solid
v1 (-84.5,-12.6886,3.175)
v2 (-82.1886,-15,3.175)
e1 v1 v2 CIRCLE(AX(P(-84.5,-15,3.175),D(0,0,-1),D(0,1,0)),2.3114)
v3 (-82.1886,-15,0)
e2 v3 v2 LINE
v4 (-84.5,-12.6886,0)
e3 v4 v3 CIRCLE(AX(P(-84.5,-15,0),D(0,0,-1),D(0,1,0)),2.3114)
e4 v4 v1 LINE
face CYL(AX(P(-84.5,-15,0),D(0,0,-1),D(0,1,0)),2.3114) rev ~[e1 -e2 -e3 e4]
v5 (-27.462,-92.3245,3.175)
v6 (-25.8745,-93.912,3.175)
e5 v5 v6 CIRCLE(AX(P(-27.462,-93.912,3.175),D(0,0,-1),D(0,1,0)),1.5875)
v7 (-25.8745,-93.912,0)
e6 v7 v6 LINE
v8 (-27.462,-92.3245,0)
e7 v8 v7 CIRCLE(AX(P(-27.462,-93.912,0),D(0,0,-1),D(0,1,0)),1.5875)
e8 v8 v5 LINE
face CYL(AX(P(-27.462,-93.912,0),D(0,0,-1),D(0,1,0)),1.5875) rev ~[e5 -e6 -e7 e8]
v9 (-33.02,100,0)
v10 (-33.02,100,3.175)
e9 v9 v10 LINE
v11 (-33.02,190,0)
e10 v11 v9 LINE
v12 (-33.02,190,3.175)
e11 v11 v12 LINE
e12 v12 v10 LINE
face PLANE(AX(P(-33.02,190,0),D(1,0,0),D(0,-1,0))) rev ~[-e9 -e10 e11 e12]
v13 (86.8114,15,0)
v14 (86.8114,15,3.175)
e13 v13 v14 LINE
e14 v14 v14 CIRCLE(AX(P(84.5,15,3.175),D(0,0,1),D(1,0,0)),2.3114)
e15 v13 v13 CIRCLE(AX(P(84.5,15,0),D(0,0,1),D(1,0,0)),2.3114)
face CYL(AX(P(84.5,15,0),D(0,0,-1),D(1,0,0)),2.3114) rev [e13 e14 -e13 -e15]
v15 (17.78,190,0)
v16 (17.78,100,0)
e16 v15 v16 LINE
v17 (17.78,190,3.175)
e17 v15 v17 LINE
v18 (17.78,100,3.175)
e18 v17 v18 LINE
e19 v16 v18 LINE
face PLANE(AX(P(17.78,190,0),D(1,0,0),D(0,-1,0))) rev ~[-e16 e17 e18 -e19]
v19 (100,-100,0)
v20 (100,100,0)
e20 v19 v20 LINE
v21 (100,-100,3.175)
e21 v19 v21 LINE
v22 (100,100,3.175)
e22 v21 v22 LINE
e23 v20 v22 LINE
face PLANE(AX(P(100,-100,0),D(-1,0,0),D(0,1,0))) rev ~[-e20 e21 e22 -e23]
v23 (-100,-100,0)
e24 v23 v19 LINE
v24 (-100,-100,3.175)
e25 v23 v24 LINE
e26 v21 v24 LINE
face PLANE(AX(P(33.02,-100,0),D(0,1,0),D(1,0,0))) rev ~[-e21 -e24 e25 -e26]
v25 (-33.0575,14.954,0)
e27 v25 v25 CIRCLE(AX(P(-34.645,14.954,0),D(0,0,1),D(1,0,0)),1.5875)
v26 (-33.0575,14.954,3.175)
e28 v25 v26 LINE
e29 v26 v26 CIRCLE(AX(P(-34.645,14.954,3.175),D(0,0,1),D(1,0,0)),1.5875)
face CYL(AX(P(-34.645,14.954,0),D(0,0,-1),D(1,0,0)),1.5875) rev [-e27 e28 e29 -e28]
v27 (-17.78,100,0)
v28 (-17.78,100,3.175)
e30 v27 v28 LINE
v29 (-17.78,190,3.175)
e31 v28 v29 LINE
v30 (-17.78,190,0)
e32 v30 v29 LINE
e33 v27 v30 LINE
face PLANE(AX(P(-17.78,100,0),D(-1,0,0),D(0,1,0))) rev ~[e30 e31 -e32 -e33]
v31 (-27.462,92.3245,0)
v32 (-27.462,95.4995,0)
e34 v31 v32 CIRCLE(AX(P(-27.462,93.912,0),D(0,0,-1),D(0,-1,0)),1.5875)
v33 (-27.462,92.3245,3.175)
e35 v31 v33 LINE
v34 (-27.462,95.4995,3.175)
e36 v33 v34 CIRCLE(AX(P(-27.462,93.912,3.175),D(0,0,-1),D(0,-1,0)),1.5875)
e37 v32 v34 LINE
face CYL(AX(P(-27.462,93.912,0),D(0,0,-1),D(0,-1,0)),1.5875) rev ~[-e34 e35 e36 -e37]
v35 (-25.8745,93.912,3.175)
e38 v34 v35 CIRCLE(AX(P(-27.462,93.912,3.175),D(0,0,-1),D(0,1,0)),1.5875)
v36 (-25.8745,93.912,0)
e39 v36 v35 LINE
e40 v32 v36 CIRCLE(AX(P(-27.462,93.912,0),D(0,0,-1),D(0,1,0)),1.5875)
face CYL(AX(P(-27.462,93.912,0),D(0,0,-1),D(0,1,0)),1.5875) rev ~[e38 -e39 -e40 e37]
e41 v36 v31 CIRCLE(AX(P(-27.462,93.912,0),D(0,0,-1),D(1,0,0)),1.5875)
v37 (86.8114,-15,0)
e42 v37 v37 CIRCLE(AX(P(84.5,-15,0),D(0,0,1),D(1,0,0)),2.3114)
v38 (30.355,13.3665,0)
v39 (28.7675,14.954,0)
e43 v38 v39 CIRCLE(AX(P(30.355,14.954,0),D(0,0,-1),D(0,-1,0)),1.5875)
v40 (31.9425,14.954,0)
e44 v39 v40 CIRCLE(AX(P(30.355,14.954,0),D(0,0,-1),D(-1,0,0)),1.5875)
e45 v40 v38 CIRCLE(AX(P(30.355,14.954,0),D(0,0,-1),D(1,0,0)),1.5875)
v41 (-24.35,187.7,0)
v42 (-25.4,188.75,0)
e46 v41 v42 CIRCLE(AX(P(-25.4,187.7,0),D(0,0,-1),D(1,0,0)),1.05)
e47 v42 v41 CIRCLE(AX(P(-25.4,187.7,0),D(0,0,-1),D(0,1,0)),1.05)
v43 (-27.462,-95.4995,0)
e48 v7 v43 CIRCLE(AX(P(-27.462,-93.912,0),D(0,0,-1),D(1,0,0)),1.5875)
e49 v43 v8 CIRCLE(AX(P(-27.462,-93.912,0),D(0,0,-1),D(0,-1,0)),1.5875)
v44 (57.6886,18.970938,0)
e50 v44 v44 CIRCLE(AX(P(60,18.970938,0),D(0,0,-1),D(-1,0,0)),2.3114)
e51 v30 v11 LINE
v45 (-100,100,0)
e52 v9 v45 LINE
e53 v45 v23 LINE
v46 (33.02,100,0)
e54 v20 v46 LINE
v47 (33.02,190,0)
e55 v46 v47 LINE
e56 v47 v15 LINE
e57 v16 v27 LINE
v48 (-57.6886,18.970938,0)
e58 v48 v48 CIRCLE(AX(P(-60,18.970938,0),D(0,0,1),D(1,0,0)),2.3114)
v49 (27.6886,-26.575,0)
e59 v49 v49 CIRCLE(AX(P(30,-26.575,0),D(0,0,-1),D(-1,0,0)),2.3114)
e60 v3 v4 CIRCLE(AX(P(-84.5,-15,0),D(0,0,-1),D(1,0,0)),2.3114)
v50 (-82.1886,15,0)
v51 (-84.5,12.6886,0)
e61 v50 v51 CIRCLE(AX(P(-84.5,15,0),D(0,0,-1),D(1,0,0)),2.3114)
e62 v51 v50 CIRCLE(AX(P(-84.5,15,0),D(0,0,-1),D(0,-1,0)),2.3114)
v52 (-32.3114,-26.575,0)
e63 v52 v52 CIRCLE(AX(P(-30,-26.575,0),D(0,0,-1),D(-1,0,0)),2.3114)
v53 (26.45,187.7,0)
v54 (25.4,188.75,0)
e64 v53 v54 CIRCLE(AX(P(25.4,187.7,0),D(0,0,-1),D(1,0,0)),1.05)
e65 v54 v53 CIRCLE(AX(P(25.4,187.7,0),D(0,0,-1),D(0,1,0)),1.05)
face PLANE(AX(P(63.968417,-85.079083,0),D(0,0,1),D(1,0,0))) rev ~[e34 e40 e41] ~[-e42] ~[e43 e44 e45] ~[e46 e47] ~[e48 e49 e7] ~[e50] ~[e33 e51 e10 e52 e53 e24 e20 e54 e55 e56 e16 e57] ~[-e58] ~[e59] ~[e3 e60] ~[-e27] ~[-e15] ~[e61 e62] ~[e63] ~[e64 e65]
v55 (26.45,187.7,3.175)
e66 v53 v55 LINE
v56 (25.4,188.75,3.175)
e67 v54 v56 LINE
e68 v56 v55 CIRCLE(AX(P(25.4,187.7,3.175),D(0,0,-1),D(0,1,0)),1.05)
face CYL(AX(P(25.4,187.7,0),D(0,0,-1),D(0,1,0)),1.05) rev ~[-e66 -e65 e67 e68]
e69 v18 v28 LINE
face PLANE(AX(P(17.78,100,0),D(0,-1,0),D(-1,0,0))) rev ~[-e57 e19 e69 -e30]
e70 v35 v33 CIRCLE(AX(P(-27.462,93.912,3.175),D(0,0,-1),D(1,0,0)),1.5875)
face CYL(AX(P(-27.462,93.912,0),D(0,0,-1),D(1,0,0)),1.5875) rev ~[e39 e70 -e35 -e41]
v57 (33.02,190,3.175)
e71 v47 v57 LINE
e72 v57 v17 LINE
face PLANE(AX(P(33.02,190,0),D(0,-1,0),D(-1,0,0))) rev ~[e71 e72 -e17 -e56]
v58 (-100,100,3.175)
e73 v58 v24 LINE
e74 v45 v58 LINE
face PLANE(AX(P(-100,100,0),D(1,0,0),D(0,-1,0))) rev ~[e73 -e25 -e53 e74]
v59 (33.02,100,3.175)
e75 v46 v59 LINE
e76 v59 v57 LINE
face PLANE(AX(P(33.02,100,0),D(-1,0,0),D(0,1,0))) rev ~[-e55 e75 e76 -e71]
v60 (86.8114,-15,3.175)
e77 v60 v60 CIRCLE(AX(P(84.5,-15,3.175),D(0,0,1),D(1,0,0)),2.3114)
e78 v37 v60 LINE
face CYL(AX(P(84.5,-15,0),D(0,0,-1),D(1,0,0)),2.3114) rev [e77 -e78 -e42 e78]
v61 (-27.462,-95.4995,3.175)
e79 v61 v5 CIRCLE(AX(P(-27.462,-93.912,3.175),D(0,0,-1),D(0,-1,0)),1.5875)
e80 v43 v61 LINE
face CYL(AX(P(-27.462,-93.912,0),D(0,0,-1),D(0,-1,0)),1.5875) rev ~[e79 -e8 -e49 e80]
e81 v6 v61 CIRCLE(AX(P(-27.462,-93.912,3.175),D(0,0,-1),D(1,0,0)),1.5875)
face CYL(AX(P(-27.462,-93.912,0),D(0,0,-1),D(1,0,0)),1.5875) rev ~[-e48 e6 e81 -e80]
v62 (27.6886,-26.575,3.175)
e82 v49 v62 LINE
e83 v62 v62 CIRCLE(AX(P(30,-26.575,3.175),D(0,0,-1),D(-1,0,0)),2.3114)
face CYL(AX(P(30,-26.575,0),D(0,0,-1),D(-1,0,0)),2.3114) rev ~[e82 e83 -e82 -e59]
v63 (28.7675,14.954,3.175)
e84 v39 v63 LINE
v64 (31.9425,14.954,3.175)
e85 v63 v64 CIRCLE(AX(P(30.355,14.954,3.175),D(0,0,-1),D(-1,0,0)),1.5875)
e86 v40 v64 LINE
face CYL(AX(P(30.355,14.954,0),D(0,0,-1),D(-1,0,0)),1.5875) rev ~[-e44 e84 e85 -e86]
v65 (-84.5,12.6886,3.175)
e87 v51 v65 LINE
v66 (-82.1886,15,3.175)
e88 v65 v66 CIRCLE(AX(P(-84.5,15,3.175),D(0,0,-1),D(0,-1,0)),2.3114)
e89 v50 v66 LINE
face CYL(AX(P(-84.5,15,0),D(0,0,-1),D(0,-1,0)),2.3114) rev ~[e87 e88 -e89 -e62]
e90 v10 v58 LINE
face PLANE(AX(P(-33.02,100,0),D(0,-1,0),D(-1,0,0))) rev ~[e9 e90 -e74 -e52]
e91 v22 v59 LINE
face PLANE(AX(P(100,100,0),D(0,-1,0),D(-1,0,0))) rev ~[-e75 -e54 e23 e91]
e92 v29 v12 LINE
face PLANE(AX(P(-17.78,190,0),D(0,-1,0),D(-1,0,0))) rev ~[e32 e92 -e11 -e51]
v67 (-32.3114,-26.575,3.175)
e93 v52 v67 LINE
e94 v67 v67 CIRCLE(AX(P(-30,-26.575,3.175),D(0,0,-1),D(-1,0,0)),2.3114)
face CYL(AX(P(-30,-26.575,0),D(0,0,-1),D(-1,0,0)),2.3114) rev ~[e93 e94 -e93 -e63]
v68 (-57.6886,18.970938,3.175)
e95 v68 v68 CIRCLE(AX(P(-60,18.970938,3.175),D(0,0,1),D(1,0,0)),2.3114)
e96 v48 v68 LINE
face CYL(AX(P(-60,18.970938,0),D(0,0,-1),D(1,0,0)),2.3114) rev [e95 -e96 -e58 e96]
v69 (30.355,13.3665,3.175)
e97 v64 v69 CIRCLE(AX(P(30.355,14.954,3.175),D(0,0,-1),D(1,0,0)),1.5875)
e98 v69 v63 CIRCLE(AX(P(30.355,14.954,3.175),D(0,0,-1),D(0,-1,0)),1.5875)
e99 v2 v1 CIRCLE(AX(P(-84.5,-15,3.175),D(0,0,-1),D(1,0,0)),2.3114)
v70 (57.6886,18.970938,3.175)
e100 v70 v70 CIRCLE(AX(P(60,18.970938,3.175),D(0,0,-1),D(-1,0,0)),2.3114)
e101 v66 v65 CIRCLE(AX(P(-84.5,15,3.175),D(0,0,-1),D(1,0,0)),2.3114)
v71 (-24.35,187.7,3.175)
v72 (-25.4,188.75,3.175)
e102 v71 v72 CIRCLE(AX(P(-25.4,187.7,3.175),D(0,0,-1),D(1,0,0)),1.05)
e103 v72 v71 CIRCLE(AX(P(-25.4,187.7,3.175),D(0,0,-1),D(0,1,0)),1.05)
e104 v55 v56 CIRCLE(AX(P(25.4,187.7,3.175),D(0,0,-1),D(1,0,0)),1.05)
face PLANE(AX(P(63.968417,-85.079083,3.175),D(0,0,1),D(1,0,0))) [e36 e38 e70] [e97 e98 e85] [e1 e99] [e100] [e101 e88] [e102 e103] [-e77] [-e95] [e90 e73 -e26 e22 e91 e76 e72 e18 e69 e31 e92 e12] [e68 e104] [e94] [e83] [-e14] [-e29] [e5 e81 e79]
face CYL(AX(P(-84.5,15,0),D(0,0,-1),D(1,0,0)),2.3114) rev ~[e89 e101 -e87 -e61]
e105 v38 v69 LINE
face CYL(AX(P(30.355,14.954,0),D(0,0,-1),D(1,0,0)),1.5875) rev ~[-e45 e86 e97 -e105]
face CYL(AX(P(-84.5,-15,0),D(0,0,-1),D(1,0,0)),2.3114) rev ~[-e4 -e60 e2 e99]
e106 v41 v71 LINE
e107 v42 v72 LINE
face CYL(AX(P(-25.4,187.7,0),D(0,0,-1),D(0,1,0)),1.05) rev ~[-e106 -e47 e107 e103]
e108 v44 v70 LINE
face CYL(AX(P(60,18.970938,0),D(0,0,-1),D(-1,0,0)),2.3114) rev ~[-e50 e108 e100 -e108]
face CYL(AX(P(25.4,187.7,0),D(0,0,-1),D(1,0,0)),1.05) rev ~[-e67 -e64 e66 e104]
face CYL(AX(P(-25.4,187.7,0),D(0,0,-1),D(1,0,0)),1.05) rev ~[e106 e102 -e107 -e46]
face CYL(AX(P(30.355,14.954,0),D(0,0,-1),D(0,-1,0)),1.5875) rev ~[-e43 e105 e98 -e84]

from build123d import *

# Parameters (mm, degrees)
F0_W     = 51.8
F0_H     = 10
F0_W_2   = 15.24
F0_H_2   = 34.925
F0_R     = 2.3114
F0_R_2   = 1.05
F0_R_3   = 1.5875
F0_W_3   = 9.38
F1_DEPTH = 3.175
F2_DEPTH = 90


# Not quite as in the source:
# - a length typed as a fraction of an inch, garbled in the dataset ("3 / 203.2 mm" for 3/8 in), is restored
# - a feature names something its author has since deleted; it is built from what else it names


with BuildPart() as f1:
    # F0 (on Top) → F1 (new body)
    with BuildSketch(Plane.XY):
        Polygon((42.4, -100), (100, -100), (100, -75.075), (48.2, -75.075), (48.2, -65.075), (33.02, -65.075), (33.02, -100), align=None)
        with Locations((74.1, -70.075)):
            Rectangle(F0_W, F0_H)
        Polygon((33.02, -140), (33.02, -100), (17.78, -100), (17.78, -140), (17.78, -190), (25.4, -190), (33.02, -190), align=None)
        with BuildLine():
            ThreePointArc((26.45, -187.7), (26.1424621202, -188.4424621202), (25.4, -188.75))
            ThreePointArc((25.4, -188.75), (24.6575378798, -186.9575378798), (26.45, -187.7))
        make_face(mode=Mode.SUBTRACT)
        with Locations((25.4, -82.5375)):
            Rectangle(F0_W_2, F0_H_2)
        with Locations((74.1, -60.075)):
            Rectangle(F0_W, F0_H)
        Polygon((0, -100), (17.78, -100), (17.78, -65.075), (-17.78, -65.075), (-17.78, -100), align=None)
        Polygon((17.78, -65.075), (33.02, -65.075), (48.2, -65.075), (48.2, -55.075), (-48.2, -55.075), (-48.2, -65.075), (-33.02, -65.075), (-17.78, -65.075), align=None)
        with BuildLine():
            Line((48.2, -55.075), (100, -55.075))
            Line((100, -55.075), (100, -26.575))
            Line((100, -26.575), (32.3114, -26.575))
            ThreePointArc((32.3114, -26.575), (30, -28.8864), (27.6886, -26.575))
            Line((27.6886, -26.575), (0, -26.575))
            Line((0, -26.575), (-27.6886, -26.575))
            ThreePointArc((-27.6886, -26.575), (-30, -28.8864), (-32.3114, -26.575))
            Line((-32.3114, -26.575), (-100, -26.575))
            Line((-100, -26.575), (-100, -55.075))
            Line((-100, -55.075), (-48.2, -55.075))
            Line((-48.2, -55.075), (48.2, -55.075))
        make_face()
        with BuildLine():
            Line((32.3114, -26.575), (100, -26.575))
            Line((100, -26.575), (100, 0))
            Line((100, 0), (0, 0))
            Line((0, 0), (0, -10.4469014332))
            Line((0, -10.4469014332), (0, -26.575))
            Line((0, -26.575), (27.6886, -26.575))
            ThreePointArc((27.6886, -26.575), (30, -24.2636), (32.3114, -26.575))
        make_face()
        with Locations((84.5, -15)):
            Circle(F0_R, mode=Mode.SUBTRACT)
        Polygon((-17.78, -140), (-17.78, -100), (-27.462, -100), (-33.02, -100), (-33.02, -140), (-33.02, -190), (-25.4, -190), (-17.78, -190), align=None)
        with BuildLine():
            ThreePointArc((-24.35, -187.7), (-24.6575378798, -188.4424621202), (-25.4, -188.75))
            ThreePointArc((-25.4, -188.75), (-26.1424621202, -186.9575378798), (-24.35, -187.7))
        make_face(mode=Mode.SUBTRACT)
        with Locations((-25.4, -137.7)):
            Circle(F0_R_2, mode=Mode.SUBTRACT)
        Polygon((-27.462, -100), (-17.78, -100), (-17.78, -65.075), (-33.02, -65.075), (-33.02, -100), align=None)
        with BuildLine():
            ThreePointArc((-25.8745, -93.912), (-26.3394679849, -95.0345320151), (-27.462, -95.4995))
            ThreePointArc((-27.462, -95.4995), (-29.0495, -93.912), (-27.462, -92.3245))
            ThreePointArc((-27.462, -92.3245), (-26.3394679849, -92.7894679849), (-25.8745, -93.912))
        make_face(mode=Mode.SUBTRACT)
        with BuildLine():
            Line((0, 0), (100, 0))
            Line((100, 0), (100, 55.075))
            Line((100, 55.075), (48.2, 55.075))
            Line((48.2, 55.075), (48.2, 65.075))
            Line((48.2, 65.075), (42.4, 65.075))
            Line((42.4, 65.075), (42.4, 18.9709383994))
            Line((42.4, 18.9709383994), (42.4, 9.75))
            Line((42.4, 9.75), (30.355, 9.75))
            Line((30.355, 9.75), (-42.4, 9.75))
            Line((-42.4, 9.75), (-42.4, 65.075))
            Line((-42.4, 65.075), (-48.2, 65.075))
            Line((-48.2, 65.075), (-48.2, 55.075))
            Line((-48.2, 55.075), (-100, 55.075))
            Line((-100, 55.075), (-100, 0))
            Line((-100, 0), (-100, -26.575))
            Line((-100, -26.575), (-32.3114, -26.575))
            ThreePointArc((-32.3114, -26.575), (-30, -24.2636), (-27.6886, -26.575))
            Line((-27.6886, -26.575), (0, -26.575))
            Line((0, -26.575), (0, -10.4469014332))
            Line((0, -10.4469014332), (0, 0))
        make_face()
        with BuildLine():
            ThreePointArc((-82.1886, -15), (-86.134406614, -16.634406614), (-84.5, -12.6886))
            ThreePointArc((-84.5, -12.6886), (-82.865593386, -13.365593386), (-82.1886, -15))
        make_face(mode=Mode.SUBTRACT)
        with BuildLine():
            ThreePointArc((-82.1886, 15), (-82.865593386, 13.365593386), (-84.5, 12.6886))
            ThreePointArc((-84.5, 12.6886), (-86.134406614, 16.634406614), (-82.1886, 15))
        make_face(mode=Mode.SUBTRACT)
        with Locations((-60, 18.9709383994)):
            Circle(F0_R, mode=Mode.SUBTRACT)
        with BuildLine():
            ThreePointArc((62.3114, 18.9709383994), (60, 16.6595383994), (57.6886, 18.9709383994))
            ThreePointArc((57.6886, 18.9709383994), (60, 21.2823383994), (62.3114, 18.9709383994))
        make_face(mode=Mode.SUBTRACT)
        with Locations((84.5, 15)):
            Circle(F0_R, mode=Mode.SUBTRACT)
        with Locations((-74.1, -60.075)):
            Rectangle(F0_W, F0_H)
        Polygon((-33.02, -100), (-33.02, -65.075), (-48.2, -65.075), (-48.2, -75.075), (-100, -75.075), (-100, -100), (-42.4, -100), align=None)
        with Locations((74.1, 60.075)):
            Rectangle(F0_W, F0_H)
        with Locations((-74.1, -70.075)):
            Rectangle(F0_W, F0_H)
        with Locations((74.1, 70.075)):
            Rectangle(F0_W, F0_H)
        Polygon((48.2, 75.075), (100, 75.075), (100, 100), (42.4, 100), (42.4, 65.075), (48.2, 65.075), align=None)
        Polygon((42.4, 18.9709383994), (42.4, 65.075), (42.4, 100), (33.02, 100), (17.78, 100), (0, 100), (-17.78, 100), (-27.462, 100), (-33.02, 100), (-33.02, 65.075), (-42.4, 65.075), (-42.4, 9.75), (30.355, 9.75), (42.4, 9.75), align=None)
        with Locations((-34.645, 14.954)):
            Circle(F0_R_3, mode=Mode.SUBTRACT)
        with BuildLine():
            ThreePointArc((-27.462, 92.3245), (-29.0495, 93.912), (-27.462, 95.4995))
            ThreePointArc((-27.462, 95.4995), (-26.3394679849, 95.0345320151), (-25.8745, 93.912))
            ThreePointArc((-25.8745, 93.912), (-26.3394679849, 92.7894679849), (-27.462, 92.3245))
        make_face(mode=Mode.SUBTRACT)
        with BuildLine():
            ThreePointArc((31.9425, 14.954), (31.4775320151, 13.8314679849), (30.355, 13.3665))
            ThreePointArc((30.355, 13.3665), (29.2324679849, 13.8314679849), (28.7675, 14.954))
            ThreePointArc((28.7675, 14.954), (30.355, 16.5415), (31.9425, 14.954))
        make_face(mode=Mode.SUBTRACT)
        with Locations((-74.1, 60.075)):
            Rectangle(F0_W, F0_H)
        with Locations((-74.1, 70.075)):
            Rectangle(F0_W, F0_H)
        Polygon((17.78, 100), (33.02, 100), (33.02, 140), (33.02, 190), (25.4, 190), (17.78, 190), (17.78, 140), align=None)
        with BuildLine():
            ThreePointArc((26.45, 187.7), (24.6575378798, 186.9575378798), (25.4, 188.75))
            ThreePointArc((25.4, 188.75), (26.1424621202, 188.4424621202), (26.45, 187.7))
        make_face(mode=Mode.SUBTRACT)
        Polygon((-100, 100), (-100, 75.075), (-48.2, 75.075), (-48.2, 65.075), (-42.4, 65.075), (-42.4, 100), align=None)
        with Locations((-37.71, 82.5375)):
            Rectangle(F0_W_3, F0_H_2)
        Polygon((-27.462, 100), (-17.78, 100), (-17.78, 140), (-17.78, 190), (-25.4, 190), (-33.02, 190), (-33.02, 140), (-33.02, 100), align=None)
        with BuildLine():
            ThreePointArc((-24.35, 187.7), (-26.1424621202, 186.9575378798), (-25.4, 188.75))
            ThreePointArc((-25.4, 188.75), (-24.6575378798, 188.4424621202), (-24.35, 187.7))
        make_face(mode=Mode.SUBTRACT)
        with Locations((-25.4, -137.7)):
            Circle(F0_R_2)
    extrude(amount=F1_DEPTH)

    # F2 (cut): faces of the model
    f2_faces = [f1.faces().sort_by_distance(p)[0] for p in [
        (25.4, -190, 1.5875),
        (-25.4, -190, 1.5875),
    ]]
    extrude(f2_faces, amount=-F2_DEPTH, mode=Mode.SUBTRACT)


solid = f1.part
